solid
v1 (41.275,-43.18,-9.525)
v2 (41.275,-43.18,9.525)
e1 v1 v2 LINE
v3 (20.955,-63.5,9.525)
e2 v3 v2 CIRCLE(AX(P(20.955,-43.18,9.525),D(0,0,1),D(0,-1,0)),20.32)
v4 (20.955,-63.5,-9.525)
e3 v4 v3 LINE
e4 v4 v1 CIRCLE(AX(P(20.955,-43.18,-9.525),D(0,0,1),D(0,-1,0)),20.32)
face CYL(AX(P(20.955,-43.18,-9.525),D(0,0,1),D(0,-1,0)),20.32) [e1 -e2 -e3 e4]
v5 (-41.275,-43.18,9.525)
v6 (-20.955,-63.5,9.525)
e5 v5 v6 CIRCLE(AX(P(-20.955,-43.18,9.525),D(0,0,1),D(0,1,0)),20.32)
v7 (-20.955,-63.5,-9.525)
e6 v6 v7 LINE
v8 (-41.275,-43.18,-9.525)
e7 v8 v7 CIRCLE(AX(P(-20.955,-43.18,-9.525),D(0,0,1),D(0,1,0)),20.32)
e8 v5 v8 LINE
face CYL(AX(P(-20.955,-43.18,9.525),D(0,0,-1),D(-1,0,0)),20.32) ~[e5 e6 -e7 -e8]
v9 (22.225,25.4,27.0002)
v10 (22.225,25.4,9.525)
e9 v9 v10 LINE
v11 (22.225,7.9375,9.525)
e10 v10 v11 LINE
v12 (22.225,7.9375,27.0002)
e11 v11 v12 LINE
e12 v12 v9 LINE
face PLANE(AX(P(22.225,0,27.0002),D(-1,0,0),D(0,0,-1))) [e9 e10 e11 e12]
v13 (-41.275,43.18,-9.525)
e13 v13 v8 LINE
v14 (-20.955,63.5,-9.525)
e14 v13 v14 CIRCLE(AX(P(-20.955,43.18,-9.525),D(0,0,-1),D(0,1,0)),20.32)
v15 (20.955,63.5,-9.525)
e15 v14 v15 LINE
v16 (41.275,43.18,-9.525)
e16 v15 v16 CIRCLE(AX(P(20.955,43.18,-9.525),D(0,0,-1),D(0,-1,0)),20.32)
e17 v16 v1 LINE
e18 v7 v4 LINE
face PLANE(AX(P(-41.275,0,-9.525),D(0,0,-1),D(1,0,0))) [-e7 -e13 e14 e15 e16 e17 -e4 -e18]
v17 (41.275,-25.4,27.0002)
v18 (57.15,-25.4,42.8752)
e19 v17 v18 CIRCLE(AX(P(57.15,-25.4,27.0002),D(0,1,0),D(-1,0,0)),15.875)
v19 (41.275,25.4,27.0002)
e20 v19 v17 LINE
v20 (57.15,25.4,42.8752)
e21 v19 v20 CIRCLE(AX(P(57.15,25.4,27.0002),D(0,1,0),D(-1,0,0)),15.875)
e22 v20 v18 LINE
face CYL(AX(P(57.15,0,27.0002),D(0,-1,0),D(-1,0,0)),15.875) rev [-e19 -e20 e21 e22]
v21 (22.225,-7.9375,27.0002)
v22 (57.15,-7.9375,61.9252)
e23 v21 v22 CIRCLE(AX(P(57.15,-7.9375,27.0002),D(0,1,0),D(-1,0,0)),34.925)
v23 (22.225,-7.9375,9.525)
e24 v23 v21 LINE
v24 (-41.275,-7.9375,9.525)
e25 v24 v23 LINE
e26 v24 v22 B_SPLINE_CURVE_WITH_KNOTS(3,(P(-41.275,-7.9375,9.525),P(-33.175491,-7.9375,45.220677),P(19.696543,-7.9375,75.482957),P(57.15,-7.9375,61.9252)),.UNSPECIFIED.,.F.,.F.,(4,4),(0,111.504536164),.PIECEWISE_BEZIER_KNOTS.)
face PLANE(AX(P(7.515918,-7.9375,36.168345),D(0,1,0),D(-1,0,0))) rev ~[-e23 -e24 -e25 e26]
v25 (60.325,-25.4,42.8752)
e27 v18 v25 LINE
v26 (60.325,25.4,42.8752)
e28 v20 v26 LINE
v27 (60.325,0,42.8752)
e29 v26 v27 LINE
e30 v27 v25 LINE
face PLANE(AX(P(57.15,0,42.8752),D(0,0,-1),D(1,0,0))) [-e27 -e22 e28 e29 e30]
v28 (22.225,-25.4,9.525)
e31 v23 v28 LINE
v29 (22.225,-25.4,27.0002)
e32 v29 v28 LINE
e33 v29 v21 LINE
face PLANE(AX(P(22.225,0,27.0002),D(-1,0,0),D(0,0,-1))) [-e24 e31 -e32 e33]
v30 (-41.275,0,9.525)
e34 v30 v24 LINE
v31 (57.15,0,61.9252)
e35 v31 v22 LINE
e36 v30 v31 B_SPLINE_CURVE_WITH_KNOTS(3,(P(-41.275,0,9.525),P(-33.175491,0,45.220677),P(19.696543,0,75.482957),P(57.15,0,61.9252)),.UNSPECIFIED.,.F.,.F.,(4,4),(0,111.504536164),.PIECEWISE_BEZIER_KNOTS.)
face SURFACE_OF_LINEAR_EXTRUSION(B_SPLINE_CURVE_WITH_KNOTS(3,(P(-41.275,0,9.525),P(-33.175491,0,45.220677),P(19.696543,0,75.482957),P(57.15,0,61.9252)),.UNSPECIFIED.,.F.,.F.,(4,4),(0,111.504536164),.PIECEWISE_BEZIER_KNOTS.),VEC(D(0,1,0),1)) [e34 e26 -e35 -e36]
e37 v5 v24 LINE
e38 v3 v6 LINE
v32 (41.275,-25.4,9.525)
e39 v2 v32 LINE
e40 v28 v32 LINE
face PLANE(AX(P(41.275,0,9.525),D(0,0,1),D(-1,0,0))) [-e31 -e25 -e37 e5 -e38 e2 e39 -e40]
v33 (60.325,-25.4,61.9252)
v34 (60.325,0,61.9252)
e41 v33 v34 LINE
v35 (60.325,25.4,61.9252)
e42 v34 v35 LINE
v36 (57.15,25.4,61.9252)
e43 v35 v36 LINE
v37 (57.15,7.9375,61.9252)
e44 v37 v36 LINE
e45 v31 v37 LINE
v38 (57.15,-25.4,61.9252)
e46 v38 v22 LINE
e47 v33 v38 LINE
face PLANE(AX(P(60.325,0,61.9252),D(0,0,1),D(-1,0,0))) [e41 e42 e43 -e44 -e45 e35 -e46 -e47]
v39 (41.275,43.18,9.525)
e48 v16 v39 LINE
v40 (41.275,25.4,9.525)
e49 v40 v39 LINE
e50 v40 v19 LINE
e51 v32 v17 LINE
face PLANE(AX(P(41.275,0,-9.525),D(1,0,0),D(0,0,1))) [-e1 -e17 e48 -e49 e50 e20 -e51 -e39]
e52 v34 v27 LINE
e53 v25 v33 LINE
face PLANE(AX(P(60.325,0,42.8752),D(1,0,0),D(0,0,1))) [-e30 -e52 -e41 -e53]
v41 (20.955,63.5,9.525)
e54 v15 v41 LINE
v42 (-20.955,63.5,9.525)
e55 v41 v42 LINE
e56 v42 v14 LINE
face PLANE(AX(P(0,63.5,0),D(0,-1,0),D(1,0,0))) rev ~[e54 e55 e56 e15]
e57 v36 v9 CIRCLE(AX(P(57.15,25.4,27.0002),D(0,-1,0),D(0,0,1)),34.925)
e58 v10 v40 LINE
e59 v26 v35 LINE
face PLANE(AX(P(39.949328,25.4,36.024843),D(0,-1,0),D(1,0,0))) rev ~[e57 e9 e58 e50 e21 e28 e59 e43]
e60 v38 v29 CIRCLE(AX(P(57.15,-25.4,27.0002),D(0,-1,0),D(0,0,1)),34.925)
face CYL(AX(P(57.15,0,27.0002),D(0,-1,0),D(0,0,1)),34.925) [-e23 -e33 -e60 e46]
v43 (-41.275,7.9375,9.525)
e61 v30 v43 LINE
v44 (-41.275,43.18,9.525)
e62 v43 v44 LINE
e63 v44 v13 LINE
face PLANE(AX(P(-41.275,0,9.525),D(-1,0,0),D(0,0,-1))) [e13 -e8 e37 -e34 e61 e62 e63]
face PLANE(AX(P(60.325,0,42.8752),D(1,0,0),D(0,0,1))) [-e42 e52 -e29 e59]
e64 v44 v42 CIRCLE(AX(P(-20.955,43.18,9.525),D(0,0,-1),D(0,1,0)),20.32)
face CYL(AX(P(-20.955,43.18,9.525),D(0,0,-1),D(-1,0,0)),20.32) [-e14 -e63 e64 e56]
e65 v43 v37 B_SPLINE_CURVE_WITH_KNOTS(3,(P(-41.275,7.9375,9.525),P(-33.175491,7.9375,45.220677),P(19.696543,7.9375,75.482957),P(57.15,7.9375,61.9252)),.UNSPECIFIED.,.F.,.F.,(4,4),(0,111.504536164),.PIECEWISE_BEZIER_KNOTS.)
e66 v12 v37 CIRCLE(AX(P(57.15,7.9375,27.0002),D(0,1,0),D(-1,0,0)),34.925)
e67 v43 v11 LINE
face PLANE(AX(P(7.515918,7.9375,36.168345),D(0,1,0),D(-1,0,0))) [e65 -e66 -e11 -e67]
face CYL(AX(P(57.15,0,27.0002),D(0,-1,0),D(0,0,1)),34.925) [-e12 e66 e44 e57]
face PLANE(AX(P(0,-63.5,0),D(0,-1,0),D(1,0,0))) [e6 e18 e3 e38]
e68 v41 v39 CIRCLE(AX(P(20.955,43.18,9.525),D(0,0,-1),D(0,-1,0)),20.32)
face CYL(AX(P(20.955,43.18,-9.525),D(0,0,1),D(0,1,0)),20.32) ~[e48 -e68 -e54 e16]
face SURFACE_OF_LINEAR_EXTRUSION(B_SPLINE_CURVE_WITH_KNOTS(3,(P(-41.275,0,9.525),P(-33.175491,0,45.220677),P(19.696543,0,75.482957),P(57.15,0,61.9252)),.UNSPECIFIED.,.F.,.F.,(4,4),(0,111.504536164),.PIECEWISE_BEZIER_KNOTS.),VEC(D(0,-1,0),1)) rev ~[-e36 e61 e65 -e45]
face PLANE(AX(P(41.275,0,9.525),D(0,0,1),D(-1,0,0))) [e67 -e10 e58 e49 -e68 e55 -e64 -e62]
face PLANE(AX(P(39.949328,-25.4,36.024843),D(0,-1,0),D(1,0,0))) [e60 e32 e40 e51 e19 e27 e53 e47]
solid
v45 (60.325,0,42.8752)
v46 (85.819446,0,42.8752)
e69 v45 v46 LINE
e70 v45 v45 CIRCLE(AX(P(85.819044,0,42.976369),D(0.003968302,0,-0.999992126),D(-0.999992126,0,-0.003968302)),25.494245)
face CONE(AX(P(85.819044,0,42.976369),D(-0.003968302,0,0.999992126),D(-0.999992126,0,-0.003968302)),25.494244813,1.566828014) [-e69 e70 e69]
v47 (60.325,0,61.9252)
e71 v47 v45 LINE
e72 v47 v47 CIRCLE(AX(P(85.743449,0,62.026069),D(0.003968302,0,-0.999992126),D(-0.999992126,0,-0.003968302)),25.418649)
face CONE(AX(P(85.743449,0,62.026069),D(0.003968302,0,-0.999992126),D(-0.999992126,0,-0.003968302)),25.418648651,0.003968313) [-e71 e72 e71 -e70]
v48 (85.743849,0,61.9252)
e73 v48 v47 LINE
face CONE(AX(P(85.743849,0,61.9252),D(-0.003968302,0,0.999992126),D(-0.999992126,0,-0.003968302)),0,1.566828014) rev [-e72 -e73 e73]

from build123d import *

# Parameters (mm, degrees)
F1_DEPTH = 63.5
F2_DEPTH = 25.4
F3_DEPTH = 7.9375
F5_R     = 20.32


# Not quite as in the source:
# - a feature names something its author has since deleted; it is built from what else it names


with BuildPart() as f1:
    # F0 (on Front) → F1 (new body, symmetric)
    with BuildSketch(Plane.XZ):
        Polygon((22.225, 9.525), (-41.275, 9.525), (-41.275, -9.525), (41.275, -9.525), (41.275, 9.525), align=None)
    extrude(amount=F1_DEPTH, both=True)

    # F0 (on Front) → F2 (join, symmetric)
    with BuildSketch(Plane.XZ):
        with BuildLine():
            Line((22.225, 27.0002), (22.225, 9.525))
            Line((22.225, 9.525), (41.275, 9.525))
            Line((41.275, 9.525), (41.275, 27.0002))
            ThreePointArc((41.275, 27.0002), (45.9246798487, 38.2255201513), (57.15, 42.8752))
            Line((57.15, 42.8752), (60.325, 42.8752))
            Line((60.325, 42.8752), (60.325, 61.9252))
            Line((60.325, 61.9252), (57.15, 61.9252))
            ThreePointArc((57.15, 61.9252), (32.4542956671, 51.6959043329), (22.225, 27.0002))
        make_face()
    extrude(amount=F2_DEPTH, both=True)

    # F0 (on Front) → F3 (join, symmetric)
    with BuildSketch(Plane.XZ):
        with BuildLine():
            add(Edge.make_bspline(
                [(-41.275, 9.525), (-33.1754907966, 45.2206768095), (19.6965429932, 75.4829570651), (57.15, 61.9252)],
                knots=[0, 0, 0, 0, 111.5045361635, 111.5045361635, 111.5045361635, 111.5045361635], degree=3))
            Line((-41.275, 9.525), (22.225, 9.525))
            Line((22.225, 9.525), (22.225, 27.0002))
            ThreePointArc((22.225, 27.0002), (32.4542956671, 51.6959043329), (57.15, 61.9252))
        make_face()
    extrude(amount=F3_DEPTH, both=True)

    # F0 (on Front) → F4 (revolve)
    with BuildSketch(Plane.XZ):
        Polygon((85.7438487918, 61.9252), (60.325, 61.9252), (60.325, 42.8752), (85.8194455504, 42.8752), align=None)
    revolve(axis=Axis((85.7816471711, 0, 52.4002), (0.0039683025, 0, -0.9999921263)))

    # F5
    f5_edges = [f1.edges().sort_by_distance(p)[0] for p in [
        (41.275, 63.5, 0),
        (-41.275, 63.5, 0),
        (-41.275, -63.5, 0),
        (41.275, -63.5, 0),
    ]]
    fillet(f5_edges, radius=F5_R)


solid = f1.part
